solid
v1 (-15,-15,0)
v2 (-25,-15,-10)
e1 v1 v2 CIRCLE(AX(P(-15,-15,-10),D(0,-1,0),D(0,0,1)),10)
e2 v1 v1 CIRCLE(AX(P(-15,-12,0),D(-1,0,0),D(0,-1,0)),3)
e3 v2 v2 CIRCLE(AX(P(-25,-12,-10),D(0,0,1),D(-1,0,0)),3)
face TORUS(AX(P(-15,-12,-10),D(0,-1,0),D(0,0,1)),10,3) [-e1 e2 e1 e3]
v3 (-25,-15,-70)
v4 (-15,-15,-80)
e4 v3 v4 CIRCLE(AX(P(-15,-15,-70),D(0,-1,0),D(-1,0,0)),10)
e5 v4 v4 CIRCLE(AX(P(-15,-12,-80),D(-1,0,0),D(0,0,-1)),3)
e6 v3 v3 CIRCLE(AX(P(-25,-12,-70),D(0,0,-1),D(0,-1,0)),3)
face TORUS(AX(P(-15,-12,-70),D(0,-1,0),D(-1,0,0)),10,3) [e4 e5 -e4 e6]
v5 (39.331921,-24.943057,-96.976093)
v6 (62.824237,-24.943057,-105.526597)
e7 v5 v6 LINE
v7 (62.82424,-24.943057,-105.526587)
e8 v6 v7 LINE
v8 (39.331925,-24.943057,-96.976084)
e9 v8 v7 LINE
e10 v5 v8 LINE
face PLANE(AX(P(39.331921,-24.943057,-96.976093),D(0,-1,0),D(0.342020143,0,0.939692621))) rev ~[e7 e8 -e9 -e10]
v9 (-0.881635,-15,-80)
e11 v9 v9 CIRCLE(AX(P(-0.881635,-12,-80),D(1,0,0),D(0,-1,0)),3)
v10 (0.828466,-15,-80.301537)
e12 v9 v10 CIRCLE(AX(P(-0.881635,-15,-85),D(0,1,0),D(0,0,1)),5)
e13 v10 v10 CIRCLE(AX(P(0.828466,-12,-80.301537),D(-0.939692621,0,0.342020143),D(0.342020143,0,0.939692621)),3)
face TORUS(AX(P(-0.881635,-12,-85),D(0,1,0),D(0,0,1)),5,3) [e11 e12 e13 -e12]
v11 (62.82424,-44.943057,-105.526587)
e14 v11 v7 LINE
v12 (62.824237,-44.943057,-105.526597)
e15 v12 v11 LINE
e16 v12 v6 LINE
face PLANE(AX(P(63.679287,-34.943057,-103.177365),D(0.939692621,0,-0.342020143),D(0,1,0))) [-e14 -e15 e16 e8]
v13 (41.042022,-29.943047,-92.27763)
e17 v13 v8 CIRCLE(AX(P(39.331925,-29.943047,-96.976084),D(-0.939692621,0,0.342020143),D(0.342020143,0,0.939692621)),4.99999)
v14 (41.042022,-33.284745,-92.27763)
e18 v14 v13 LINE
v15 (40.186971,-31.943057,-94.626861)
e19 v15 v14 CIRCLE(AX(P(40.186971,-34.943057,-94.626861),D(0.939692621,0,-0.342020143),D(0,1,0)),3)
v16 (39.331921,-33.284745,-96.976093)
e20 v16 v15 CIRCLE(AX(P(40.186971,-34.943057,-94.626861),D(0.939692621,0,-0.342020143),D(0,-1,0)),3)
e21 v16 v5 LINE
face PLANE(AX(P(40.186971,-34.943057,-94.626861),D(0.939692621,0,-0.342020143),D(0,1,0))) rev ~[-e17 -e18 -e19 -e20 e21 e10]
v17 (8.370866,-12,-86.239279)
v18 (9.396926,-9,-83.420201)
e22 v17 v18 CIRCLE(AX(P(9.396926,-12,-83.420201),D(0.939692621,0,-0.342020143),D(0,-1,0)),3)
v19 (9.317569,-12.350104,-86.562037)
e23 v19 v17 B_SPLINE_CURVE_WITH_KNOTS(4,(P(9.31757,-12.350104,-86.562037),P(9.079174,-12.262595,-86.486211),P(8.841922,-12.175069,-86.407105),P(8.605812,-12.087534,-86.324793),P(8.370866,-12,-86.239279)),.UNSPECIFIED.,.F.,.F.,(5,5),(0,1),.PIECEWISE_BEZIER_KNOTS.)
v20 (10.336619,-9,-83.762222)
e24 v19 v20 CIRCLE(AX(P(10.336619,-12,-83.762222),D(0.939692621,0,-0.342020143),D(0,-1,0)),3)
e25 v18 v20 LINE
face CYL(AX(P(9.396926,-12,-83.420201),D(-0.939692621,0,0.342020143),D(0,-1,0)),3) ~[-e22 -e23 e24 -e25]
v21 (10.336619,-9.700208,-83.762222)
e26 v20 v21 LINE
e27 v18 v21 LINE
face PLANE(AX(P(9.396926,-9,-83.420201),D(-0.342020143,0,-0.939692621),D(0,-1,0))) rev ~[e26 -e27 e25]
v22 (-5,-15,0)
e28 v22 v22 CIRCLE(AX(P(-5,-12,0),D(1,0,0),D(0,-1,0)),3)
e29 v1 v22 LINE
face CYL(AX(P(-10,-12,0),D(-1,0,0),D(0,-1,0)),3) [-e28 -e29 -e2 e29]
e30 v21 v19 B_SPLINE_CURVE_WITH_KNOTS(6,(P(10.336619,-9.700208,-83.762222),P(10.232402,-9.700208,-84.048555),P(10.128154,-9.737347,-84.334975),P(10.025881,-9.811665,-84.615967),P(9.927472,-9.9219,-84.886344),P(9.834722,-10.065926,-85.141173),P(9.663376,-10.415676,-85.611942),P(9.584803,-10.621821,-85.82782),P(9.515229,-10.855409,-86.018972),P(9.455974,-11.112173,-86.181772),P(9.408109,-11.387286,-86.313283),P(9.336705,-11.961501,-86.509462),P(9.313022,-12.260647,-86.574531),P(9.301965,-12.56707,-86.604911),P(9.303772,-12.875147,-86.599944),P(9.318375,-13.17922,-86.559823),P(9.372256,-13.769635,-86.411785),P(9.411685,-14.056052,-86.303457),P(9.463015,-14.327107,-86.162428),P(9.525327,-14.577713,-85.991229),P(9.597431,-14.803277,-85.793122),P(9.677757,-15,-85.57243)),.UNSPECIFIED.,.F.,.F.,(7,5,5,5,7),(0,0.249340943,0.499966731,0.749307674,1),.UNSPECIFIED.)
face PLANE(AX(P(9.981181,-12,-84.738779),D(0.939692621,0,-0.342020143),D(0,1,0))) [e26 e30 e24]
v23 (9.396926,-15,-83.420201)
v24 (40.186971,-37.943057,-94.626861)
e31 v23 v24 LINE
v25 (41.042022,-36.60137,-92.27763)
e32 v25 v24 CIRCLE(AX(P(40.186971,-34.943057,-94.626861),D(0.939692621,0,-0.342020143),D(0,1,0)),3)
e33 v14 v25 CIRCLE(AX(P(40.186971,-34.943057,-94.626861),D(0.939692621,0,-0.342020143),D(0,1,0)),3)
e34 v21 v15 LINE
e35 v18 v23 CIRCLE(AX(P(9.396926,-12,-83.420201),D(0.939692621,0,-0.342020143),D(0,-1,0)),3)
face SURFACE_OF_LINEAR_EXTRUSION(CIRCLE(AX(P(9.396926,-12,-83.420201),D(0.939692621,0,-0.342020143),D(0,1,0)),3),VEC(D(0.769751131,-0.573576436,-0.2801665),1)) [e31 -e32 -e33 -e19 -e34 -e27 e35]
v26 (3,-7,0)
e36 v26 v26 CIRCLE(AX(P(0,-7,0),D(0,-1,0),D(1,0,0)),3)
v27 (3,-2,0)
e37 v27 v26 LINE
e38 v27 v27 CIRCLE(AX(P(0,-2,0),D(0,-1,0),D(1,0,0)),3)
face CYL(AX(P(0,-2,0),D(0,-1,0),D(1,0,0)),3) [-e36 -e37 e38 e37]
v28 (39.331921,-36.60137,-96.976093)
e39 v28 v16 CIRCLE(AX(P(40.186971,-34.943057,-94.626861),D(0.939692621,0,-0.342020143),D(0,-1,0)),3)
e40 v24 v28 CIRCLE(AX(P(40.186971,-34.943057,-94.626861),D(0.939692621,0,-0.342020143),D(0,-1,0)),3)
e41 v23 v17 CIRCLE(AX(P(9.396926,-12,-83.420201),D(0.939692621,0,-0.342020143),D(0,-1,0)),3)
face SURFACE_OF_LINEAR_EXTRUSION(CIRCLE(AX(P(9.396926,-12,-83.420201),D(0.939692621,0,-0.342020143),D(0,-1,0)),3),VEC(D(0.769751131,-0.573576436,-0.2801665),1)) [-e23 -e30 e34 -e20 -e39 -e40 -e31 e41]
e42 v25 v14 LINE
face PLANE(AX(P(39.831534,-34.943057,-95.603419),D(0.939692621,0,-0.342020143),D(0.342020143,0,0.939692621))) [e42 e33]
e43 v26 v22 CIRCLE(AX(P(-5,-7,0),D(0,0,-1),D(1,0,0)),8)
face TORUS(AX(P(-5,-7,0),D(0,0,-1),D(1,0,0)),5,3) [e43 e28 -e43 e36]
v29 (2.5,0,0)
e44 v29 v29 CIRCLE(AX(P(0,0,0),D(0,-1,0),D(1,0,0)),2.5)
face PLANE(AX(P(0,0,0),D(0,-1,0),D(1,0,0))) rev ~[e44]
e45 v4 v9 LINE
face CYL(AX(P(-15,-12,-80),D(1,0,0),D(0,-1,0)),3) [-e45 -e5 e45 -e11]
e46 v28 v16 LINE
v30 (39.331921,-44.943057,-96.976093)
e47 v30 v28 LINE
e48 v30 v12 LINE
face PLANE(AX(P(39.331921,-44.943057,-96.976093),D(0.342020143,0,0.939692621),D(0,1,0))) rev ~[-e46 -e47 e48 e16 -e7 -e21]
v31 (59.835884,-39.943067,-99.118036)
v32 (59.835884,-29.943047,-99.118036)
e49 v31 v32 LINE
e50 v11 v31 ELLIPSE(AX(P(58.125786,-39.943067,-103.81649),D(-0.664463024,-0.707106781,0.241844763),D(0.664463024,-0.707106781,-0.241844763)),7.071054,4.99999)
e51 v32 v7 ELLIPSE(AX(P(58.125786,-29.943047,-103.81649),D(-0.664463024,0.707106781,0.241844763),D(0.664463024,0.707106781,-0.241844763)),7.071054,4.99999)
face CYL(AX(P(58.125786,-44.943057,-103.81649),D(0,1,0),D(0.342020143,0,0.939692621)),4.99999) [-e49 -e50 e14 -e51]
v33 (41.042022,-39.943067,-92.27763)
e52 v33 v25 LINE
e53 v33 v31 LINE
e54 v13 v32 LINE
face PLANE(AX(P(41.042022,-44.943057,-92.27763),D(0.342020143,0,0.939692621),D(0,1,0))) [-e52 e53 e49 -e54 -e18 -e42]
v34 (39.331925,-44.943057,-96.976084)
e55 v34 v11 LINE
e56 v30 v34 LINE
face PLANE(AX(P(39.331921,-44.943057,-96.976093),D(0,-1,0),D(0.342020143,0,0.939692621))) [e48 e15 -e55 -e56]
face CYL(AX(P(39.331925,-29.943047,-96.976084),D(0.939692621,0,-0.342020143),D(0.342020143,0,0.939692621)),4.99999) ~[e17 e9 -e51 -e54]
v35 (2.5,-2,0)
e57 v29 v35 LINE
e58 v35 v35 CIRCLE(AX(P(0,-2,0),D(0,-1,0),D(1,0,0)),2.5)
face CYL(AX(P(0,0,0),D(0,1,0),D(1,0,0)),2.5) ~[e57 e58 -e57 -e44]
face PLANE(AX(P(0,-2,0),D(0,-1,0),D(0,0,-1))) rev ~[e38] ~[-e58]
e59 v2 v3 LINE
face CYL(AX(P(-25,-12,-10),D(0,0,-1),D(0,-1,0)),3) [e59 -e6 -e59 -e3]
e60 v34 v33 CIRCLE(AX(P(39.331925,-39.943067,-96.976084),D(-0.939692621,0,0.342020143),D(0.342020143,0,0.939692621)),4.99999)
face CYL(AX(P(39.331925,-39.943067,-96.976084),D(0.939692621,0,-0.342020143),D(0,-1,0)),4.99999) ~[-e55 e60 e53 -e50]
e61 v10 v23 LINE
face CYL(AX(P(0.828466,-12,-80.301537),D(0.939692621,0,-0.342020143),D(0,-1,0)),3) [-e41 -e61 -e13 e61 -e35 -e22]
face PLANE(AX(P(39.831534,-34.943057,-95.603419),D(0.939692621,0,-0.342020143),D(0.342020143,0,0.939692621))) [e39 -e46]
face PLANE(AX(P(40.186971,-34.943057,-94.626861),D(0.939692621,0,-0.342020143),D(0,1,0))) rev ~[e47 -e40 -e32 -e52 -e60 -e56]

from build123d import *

# Parameters (mm, degrees)
F0_R      = 2.5
F1_DEPTH  = 2
F2_R      = 3
F5_R      = 3
F10_DEPTH = 1
F13_W     = 20
F13_H     = 5
F14_DEPTH = 25
F15_R     = 4.99999


# Not quite as in the source:
# - a fillet or chamfer is up to 0.001 mm smaller than in the source, because OpenCascade refuses the exact size


with BuildPart() as f1:
    # F0 (on Front) → F1 (new body)
    with BuildSketch(Plane.XZ):
        Circle(F0_R)
    extrude(amount=F1_DEPTH)

    # F4: sweep along a path in F3
    with BuildLine(Plane.XY) as f4_path:
        Line((0, -2), (0, -7))
        ThreePointArc((0, -7), (-1.4644660941, -10.5355339059), (-5, -12))
        Line((-5, -12), (-10, -12))
    # F2 (on face) → F4 (sweep)
    with BuildSketch(Plane.XZ.offset(2)):
        Circle(F2_R)
    sweep(path=f4_path.line)

    # F8: sweep along a path in F7
    with BuildLine(Plane.XZ.offset(12)) as f8_path:
        Line((-10, 0), (-15, 0))
        ThreePointArc((-15, 0), (-22.0710678119, -2.9289321881), (-25, -10))
        Line((-25, -10), (-25, -70))
        ThreePointArc((-25, -70), (-22.0710678119, -77.0710678119), (-15, -80))
        Line((-15, -80), (-0.8816349035, -80))
        ThreePointArc((-0.8816349035, -80), (-0.0133940152, -80.0759612349), (0.8284658131, -80.3015368961))
        Line((0.8284658131, -80.3015368961), (9.3969262079, -83.4202014333))
    # F5 (on face) → F8 (sweep)
    with BuildSketch(Plane(origin=(-10, 0, 0), x_dir=(0, -1, 0), z_dir=(-1, 0, 0))):
        with Locations((12, 0)):
            Circle(F5_R)
    sweep(path=f8_path.line)

    # F9 (on face) → F10 (join)
    with BuildSketch(Plane(origin=(35.1084305953, 0, -12.7784237085), x_dir=(0, 1, 0), z_dir=(0.9396926208, 0, -0.3420201433))):
        with BuildLine():
            Line((-9, -75.1754096629), (-15, -75.1754096629))
            ThreePointArc((-15, -75.1754096629), (-12, -78.1754096629), (-9, -75.1754096629))
        make_face()
    extrude(amount=F10_DEPTH)

    # F12: sweep along a path in F11
    with BuildLine(Plane(origin=(-25.7115043875, 0, -70.6417777248), x_dir=(0.9396926208, 0, -0.3420201433), z_dir=(0.3420201433, 0, 0.9396926208))) as f12_path:
        Line((37.3616114661, -12), (70.1276932376, -34.943057454))
    # F9 (on face) + F8_face (on face) → F12 (sweep)
    with BuildSketch(Plane(origin=(35.1084305953, 0, -12.7784237085), x_dir=(0, 1, 0), z_dir=(0.9396926208, 0, -0.3420201433))):
        with BuildLine():
            Line((-9, -75.1754096629), (-15, -75.1754096629))
            ThreePointArc((-15, -75.1754096629), (-12, -78.1754096629), (-9, -75.1754096629))
        make_face()
    with BuildSketch(Plane(origin=(9.3969262079, -12, -83.4202014333), x_dir=(0, 1, 0), z_dir=(0.9396926208, 0, -0.3420201433))):
        with BuildLine():
            ThreePointArc((3, 0), (0, 3), (-3, 0))
            Line((-3, 0), (3, 0))
        make_face()
    sweep(path=f12_path.line)

    # F13 (on face) → F14 (join)
    with BuildSketch(Plane(origin=(65.8984758481, 0, -23.9850836922), x_dir=(0, 1, 0), z_dir=(0.9396926208, 0, -0.3420201433))):
        with Locations((-34.943057454, -75.1754096629)):
            Rectangle(F13_W, F13_H)
    extrude(amount=F14_DEPTH)

    # F15 (radius 5 in the source; OpenCascade refuses exactly that, so slightly less here)
    f15_edges = [f1.edges().sort_by_distance(p)[0] for p in [
        (52.78818, -44.943057, -96.552882),
        (64.534337, -34.943057, -100.828133),
        (52.78818, -24.943057, -96.552882),
    ]]
    fillet(f15_edges, radius=F15_R)


solid = f1.part
